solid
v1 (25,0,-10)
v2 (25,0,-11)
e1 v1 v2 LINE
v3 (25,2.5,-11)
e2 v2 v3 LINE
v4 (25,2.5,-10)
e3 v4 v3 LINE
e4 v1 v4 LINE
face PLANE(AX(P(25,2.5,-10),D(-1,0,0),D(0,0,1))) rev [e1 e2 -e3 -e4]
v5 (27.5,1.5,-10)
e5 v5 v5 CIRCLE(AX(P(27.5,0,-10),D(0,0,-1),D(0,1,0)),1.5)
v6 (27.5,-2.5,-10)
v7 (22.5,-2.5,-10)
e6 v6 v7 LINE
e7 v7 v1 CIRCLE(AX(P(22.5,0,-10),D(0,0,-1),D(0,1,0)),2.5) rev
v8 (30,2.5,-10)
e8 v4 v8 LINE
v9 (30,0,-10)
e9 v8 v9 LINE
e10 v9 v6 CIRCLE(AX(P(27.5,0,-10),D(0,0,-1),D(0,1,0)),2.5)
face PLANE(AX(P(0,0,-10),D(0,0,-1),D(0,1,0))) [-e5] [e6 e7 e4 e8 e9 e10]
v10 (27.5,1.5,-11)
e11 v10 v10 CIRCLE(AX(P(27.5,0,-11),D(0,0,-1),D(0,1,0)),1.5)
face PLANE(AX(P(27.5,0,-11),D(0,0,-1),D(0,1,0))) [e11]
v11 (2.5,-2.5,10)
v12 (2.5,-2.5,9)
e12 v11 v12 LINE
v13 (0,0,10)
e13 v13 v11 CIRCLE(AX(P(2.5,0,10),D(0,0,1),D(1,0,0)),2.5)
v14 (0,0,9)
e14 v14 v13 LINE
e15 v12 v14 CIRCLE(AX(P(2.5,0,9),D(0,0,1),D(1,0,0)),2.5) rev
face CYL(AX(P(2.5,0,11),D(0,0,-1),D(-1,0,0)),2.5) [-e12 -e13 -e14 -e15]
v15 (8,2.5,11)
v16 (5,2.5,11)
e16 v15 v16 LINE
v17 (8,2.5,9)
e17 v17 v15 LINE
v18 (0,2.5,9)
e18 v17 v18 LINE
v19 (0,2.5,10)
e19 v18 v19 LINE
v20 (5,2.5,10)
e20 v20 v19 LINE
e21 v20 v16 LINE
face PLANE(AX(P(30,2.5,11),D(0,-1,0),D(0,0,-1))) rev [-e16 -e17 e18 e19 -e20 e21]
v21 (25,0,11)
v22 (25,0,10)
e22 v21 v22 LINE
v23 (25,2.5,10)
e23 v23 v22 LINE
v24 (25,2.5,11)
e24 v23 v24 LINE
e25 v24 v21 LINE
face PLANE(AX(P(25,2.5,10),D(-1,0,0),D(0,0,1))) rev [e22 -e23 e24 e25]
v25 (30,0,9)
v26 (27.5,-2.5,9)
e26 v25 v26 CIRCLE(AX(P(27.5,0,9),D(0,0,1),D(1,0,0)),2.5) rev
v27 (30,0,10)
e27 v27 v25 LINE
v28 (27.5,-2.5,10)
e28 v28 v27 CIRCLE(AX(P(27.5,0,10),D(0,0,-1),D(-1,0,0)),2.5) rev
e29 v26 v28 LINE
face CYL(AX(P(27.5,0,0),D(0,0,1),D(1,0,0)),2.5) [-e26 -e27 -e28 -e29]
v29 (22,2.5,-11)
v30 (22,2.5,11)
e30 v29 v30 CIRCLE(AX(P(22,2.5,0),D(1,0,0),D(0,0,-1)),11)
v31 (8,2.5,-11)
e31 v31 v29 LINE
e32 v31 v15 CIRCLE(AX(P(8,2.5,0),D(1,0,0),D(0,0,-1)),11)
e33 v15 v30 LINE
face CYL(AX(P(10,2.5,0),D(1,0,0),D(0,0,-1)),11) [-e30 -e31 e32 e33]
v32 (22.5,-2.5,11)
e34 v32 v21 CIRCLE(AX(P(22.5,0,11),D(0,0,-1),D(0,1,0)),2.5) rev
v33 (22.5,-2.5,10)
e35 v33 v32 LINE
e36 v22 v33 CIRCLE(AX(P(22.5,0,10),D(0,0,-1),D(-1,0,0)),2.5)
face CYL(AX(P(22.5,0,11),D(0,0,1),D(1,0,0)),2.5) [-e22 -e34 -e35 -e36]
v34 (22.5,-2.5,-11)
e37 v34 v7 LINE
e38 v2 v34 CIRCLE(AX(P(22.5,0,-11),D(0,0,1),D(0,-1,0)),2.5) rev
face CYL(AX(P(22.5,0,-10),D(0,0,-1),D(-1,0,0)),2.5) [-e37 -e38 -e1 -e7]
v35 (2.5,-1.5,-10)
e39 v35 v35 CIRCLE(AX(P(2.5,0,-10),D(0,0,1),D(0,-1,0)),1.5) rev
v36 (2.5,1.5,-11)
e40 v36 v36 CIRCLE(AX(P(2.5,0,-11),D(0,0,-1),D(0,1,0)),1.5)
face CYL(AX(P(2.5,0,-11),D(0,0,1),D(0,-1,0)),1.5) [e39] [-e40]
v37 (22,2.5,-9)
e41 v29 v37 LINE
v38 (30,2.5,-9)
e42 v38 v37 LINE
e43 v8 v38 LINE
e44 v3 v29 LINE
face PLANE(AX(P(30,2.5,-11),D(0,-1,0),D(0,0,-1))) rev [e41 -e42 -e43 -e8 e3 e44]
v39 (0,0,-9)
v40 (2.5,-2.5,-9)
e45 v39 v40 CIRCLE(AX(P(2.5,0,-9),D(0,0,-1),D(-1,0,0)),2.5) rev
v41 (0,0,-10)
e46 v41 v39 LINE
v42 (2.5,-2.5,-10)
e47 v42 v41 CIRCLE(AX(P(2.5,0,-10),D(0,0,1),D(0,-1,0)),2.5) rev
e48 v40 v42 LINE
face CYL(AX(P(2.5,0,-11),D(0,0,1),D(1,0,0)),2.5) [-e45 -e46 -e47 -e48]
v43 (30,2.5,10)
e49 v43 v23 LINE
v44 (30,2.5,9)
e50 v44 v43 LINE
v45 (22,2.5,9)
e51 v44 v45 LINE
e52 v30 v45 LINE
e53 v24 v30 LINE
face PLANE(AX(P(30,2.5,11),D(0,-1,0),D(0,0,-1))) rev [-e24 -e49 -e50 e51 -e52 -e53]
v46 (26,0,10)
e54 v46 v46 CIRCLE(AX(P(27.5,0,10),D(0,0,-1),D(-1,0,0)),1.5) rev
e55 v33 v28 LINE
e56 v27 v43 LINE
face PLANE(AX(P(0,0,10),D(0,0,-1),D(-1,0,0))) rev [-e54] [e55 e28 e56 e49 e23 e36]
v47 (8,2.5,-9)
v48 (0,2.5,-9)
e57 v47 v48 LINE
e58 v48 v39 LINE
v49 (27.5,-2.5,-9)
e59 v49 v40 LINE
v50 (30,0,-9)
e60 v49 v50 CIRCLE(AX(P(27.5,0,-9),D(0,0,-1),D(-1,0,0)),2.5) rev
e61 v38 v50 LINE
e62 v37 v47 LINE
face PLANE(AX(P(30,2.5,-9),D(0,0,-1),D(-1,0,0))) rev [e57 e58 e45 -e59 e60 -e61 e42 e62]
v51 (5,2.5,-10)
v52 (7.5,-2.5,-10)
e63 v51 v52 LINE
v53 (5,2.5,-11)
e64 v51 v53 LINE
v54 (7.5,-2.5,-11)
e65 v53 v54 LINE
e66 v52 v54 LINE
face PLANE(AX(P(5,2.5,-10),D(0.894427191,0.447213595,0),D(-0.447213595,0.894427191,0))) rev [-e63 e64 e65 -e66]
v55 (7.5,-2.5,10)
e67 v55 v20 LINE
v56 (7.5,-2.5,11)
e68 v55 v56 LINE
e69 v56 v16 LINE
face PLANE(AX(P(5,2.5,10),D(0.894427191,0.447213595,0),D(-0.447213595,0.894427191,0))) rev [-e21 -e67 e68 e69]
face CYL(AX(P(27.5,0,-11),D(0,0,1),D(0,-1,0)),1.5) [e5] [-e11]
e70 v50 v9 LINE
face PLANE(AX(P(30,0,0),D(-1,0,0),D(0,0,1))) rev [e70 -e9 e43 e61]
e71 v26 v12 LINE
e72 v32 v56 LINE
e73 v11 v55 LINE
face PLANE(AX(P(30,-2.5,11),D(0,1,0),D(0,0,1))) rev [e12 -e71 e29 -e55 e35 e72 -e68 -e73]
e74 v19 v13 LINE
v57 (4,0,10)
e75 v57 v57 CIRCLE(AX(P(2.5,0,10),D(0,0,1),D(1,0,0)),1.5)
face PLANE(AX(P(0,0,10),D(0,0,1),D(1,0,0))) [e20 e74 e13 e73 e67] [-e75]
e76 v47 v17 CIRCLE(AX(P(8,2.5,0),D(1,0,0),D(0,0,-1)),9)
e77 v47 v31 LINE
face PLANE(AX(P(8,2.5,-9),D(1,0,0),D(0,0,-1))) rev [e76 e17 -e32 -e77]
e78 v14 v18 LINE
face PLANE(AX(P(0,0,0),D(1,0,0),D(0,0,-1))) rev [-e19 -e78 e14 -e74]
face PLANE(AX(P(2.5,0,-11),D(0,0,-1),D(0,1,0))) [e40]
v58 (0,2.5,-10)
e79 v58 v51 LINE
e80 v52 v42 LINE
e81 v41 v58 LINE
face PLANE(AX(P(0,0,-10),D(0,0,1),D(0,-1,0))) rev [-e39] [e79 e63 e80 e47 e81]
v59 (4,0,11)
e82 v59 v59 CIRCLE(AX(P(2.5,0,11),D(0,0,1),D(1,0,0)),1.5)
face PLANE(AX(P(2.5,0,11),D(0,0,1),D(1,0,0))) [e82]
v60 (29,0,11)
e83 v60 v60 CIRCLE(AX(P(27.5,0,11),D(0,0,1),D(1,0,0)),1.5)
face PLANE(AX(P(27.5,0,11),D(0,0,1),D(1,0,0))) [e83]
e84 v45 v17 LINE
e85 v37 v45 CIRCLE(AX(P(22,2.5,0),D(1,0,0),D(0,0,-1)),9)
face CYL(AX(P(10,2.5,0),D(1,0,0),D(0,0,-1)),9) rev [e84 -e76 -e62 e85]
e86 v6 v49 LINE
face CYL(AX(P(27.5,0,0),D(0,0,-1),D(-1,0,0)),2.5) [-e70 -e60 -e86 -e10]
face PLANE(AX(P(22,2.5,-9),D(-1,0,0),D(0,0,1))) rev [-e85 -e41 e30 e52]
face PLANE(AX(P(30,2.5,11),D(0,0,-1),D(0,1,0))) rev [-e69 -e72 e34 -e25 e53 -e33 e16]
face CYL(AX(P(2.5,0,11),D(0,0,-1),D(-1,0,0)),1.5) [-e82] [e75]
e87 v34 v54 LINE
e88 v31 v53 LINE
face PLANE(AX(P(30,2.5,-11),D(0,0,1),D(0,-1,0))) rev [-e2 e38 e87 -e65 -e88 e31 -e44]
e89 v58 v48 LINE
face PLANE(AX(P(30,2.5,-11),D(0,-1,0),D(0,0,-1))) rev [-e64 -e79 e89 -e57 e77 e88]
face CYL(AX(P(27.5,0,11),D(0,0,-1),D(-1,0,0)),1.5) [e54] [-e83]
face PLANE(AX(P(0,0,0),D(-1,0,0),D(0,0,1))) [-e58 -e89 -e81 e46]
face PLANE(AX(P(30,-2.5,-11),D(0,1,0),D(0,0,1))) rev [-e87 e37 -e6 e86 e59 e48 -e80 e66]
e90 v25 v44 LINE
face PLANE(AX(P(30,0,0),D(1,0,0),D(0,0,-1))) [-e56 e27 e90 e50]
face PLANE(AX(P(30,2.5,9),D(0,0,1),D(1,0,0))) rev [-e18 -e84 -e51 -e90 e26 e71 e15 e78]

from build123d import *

# Parameters (mm, degrees)
SKETCH3_W             = 2
SKETCH3_H             = 5
BOSS_EXTRUDE1_DEPTH   = 30
BOSS_EXTRUDE1_2_DEPTH = 30
SKETCH4_W             = 5
SKETCH4_H             = 5
CUT_EXTRUDE1_DEPTH    = 1
SKETCH5_W             = 5
SKETCH5_H             = 5
CUT_EXTRUDE2_DEPTH    = 1
SWEEP1_START          = 8
SWEEP1_DEPTH          = 14
SKETCH7_R             = 1.5
BOSS_EXTRUDE2_DEPTH   = 1
BOSS_EXTRUDE3_START   = 1
SKETCH8_R             = 1.5
BOSS_EXTRUDE3_DEPTH   = 1
FILLET1_R             = 2.5
CUT_EXTRUDE3_DEPTH    = 1
CUT_EXTRUDE4_DEPTH    = 1
FILLET2_R             = 2.5


# Read off the part's stored shape, not the designer's step: Sweep1
with BuildPart() as part:
    # Sketch3 → Boss-Extrude1 (new body)
    with BuildSketch(Plane(origin=(0, 0, 0), x_dir=(0, 0, -1), z_dir=(1, 0, 0))):
        with Locations((-10, 0)):
            Rectangle(SKETCH3_W, SKETCH3_H)
    extrude(amount=BOSS_EXTRUDE1_DEPTH)

    # Sketch4 → Cut-Extrude1 (cut)
    with BuildSketch(Plane.XY.offset(11)):
        with Locations((2.5, 0)):
            Rectangle(SKETCH4_W, SKETCH4_H)
        with Locations((27.5, 0)):
            Rectangle(SKETCH4_W, SKETCH4_H)
    extrude(amount=-CUT_EXTRUDE1_DEPTH, mode=Mode.SUBTRACT)



with BuildPart() as body_2:
    # Sketch3 → Boss-Extrude1 2 (new body)
    with BuildSketch(Plane(origin=(0, 0, 0), x_dir=(0, 0, -1), z_dir=(1, 0, 0))):
        with Locations((10, 0)):
            Rectangle(SKETCH3_W, SKETCH3_H)
    extrude(amount=BOSS_EXTRUDE1_2_DEPTH)

    # Sketch5 → Cut-Extrude2 (cut)
    with BuildSketch(Plane(origin=(0, 0, -11), x_dir=(-1, 0, 0), z_dir=(0, 0, -1))):
        with Locations((-27.5, 0)):
            Rectangle(SKETCH5_W, SKETCH5_H)
        with Locations((-2.5, 0)):
            Rectangle(SKETCH5_W, SKETCH5_H)
    extrude(amount=-CUT_EXTRUDE2_DEPTH, mode=Mode.SUBTRACT)


with BuildPart() as part_1:
    add(part.part)

    add(body_2.part)  # Sweep1 merges body 2
    # Sweep1 outline → Sweep1 (add)
    with BuildSketch(Plane.YZ.offset(SWEEP1_START)):
        with BuildLine():
            Line((2.5, -9), (2.5, -11))
            ThreePointArc((2.5, -11), (13.5, 0), (2.5, 11))
            Line((2.5, 11), (2.5, 9))
            ThreePointArc((2.5, 9), (11.5, 0), (2.5, -9))
        make_face()
    extrude(amount=SWEEP1_DEPTH)

    # Sketch7 → Boss-Extrude2 (add)
    with BuildSketch(Plane(origin=(0, 0, -10), x_dir=(-1, 0, 0), z_dir=(0, 0, -1))):
        with Locations(Location((-2.5, 0, 0), (0, 0, 270))):
            Circle(SKETCH7_R)
        with Locations(Location((-27.5, 0, 0), (0, 0, 90))):
            Circle(SKETCH7_R)
    extrude(amount=BOSS_EXTRUDE2_DEPTH)

    # Sketch8 → Boss-Extrude3 (add)
    with BuildSketch(Plane.XY.offset(10).offset(BOSS_EXTRUDE3_START)):
        with Locations(Location((27.5, 0, 0), (0, 0, 90))):
            Circle(SKETCH8_R)
        with Locations(Location((2.5, 0, 0), (0, 0, 270))):
            Circle(SKETCH8_R)
    extrude(amount=-BOSS_EXTRUDE3_DEPTH)

    # Fillet1
    fillet1_edges = [part_1.edges().sort_by_distance(p)[0] for p in [
        (0, -2.5, 9.5),
        (30, -2.5, 9.5),
        (30, -2.5, -9.5),
        (0, -2.5, -9.5),
    ]]
    fillet(fillet1_edges, radius=FILLET1_R)

    # Sketch9 → Cut-Extrude3 (cut)
    with BuildSketch(Plane.XY.offset(11)):
        Polygon((5, 2.5), (7.5, -2.5), (5, -2.5), align=None)
    extrude(amount=-CUT_EXTRUDE3_DEPTH, mode=Mode.SUBTRACT)

    # Sketch10 → Cut-Extrude4 (cut)
    with BuildSketch(Plane(origin=(0, 0, -11), x_dir=(-1, 0, 0), z_dir=(0, 0, -1))):
        Polygon((-5, 2.5), (-7.5, -2.5), (-5, -2.5), align=None)
    extrude(amount=-CUT_EXTRUDE4_DEPTH, mode=Mode.SUBTRACT)

    # Fillet2
    fillet2_edges = [part_1.edges().sort_by_distance(p)[0] for p in [
        (25, -2.5, 10.5),
        (25, -2.5, -10.5),
    ]]
    fillet(fillet2_edges, radius=FILLET2_R)


solid = part_1.part
